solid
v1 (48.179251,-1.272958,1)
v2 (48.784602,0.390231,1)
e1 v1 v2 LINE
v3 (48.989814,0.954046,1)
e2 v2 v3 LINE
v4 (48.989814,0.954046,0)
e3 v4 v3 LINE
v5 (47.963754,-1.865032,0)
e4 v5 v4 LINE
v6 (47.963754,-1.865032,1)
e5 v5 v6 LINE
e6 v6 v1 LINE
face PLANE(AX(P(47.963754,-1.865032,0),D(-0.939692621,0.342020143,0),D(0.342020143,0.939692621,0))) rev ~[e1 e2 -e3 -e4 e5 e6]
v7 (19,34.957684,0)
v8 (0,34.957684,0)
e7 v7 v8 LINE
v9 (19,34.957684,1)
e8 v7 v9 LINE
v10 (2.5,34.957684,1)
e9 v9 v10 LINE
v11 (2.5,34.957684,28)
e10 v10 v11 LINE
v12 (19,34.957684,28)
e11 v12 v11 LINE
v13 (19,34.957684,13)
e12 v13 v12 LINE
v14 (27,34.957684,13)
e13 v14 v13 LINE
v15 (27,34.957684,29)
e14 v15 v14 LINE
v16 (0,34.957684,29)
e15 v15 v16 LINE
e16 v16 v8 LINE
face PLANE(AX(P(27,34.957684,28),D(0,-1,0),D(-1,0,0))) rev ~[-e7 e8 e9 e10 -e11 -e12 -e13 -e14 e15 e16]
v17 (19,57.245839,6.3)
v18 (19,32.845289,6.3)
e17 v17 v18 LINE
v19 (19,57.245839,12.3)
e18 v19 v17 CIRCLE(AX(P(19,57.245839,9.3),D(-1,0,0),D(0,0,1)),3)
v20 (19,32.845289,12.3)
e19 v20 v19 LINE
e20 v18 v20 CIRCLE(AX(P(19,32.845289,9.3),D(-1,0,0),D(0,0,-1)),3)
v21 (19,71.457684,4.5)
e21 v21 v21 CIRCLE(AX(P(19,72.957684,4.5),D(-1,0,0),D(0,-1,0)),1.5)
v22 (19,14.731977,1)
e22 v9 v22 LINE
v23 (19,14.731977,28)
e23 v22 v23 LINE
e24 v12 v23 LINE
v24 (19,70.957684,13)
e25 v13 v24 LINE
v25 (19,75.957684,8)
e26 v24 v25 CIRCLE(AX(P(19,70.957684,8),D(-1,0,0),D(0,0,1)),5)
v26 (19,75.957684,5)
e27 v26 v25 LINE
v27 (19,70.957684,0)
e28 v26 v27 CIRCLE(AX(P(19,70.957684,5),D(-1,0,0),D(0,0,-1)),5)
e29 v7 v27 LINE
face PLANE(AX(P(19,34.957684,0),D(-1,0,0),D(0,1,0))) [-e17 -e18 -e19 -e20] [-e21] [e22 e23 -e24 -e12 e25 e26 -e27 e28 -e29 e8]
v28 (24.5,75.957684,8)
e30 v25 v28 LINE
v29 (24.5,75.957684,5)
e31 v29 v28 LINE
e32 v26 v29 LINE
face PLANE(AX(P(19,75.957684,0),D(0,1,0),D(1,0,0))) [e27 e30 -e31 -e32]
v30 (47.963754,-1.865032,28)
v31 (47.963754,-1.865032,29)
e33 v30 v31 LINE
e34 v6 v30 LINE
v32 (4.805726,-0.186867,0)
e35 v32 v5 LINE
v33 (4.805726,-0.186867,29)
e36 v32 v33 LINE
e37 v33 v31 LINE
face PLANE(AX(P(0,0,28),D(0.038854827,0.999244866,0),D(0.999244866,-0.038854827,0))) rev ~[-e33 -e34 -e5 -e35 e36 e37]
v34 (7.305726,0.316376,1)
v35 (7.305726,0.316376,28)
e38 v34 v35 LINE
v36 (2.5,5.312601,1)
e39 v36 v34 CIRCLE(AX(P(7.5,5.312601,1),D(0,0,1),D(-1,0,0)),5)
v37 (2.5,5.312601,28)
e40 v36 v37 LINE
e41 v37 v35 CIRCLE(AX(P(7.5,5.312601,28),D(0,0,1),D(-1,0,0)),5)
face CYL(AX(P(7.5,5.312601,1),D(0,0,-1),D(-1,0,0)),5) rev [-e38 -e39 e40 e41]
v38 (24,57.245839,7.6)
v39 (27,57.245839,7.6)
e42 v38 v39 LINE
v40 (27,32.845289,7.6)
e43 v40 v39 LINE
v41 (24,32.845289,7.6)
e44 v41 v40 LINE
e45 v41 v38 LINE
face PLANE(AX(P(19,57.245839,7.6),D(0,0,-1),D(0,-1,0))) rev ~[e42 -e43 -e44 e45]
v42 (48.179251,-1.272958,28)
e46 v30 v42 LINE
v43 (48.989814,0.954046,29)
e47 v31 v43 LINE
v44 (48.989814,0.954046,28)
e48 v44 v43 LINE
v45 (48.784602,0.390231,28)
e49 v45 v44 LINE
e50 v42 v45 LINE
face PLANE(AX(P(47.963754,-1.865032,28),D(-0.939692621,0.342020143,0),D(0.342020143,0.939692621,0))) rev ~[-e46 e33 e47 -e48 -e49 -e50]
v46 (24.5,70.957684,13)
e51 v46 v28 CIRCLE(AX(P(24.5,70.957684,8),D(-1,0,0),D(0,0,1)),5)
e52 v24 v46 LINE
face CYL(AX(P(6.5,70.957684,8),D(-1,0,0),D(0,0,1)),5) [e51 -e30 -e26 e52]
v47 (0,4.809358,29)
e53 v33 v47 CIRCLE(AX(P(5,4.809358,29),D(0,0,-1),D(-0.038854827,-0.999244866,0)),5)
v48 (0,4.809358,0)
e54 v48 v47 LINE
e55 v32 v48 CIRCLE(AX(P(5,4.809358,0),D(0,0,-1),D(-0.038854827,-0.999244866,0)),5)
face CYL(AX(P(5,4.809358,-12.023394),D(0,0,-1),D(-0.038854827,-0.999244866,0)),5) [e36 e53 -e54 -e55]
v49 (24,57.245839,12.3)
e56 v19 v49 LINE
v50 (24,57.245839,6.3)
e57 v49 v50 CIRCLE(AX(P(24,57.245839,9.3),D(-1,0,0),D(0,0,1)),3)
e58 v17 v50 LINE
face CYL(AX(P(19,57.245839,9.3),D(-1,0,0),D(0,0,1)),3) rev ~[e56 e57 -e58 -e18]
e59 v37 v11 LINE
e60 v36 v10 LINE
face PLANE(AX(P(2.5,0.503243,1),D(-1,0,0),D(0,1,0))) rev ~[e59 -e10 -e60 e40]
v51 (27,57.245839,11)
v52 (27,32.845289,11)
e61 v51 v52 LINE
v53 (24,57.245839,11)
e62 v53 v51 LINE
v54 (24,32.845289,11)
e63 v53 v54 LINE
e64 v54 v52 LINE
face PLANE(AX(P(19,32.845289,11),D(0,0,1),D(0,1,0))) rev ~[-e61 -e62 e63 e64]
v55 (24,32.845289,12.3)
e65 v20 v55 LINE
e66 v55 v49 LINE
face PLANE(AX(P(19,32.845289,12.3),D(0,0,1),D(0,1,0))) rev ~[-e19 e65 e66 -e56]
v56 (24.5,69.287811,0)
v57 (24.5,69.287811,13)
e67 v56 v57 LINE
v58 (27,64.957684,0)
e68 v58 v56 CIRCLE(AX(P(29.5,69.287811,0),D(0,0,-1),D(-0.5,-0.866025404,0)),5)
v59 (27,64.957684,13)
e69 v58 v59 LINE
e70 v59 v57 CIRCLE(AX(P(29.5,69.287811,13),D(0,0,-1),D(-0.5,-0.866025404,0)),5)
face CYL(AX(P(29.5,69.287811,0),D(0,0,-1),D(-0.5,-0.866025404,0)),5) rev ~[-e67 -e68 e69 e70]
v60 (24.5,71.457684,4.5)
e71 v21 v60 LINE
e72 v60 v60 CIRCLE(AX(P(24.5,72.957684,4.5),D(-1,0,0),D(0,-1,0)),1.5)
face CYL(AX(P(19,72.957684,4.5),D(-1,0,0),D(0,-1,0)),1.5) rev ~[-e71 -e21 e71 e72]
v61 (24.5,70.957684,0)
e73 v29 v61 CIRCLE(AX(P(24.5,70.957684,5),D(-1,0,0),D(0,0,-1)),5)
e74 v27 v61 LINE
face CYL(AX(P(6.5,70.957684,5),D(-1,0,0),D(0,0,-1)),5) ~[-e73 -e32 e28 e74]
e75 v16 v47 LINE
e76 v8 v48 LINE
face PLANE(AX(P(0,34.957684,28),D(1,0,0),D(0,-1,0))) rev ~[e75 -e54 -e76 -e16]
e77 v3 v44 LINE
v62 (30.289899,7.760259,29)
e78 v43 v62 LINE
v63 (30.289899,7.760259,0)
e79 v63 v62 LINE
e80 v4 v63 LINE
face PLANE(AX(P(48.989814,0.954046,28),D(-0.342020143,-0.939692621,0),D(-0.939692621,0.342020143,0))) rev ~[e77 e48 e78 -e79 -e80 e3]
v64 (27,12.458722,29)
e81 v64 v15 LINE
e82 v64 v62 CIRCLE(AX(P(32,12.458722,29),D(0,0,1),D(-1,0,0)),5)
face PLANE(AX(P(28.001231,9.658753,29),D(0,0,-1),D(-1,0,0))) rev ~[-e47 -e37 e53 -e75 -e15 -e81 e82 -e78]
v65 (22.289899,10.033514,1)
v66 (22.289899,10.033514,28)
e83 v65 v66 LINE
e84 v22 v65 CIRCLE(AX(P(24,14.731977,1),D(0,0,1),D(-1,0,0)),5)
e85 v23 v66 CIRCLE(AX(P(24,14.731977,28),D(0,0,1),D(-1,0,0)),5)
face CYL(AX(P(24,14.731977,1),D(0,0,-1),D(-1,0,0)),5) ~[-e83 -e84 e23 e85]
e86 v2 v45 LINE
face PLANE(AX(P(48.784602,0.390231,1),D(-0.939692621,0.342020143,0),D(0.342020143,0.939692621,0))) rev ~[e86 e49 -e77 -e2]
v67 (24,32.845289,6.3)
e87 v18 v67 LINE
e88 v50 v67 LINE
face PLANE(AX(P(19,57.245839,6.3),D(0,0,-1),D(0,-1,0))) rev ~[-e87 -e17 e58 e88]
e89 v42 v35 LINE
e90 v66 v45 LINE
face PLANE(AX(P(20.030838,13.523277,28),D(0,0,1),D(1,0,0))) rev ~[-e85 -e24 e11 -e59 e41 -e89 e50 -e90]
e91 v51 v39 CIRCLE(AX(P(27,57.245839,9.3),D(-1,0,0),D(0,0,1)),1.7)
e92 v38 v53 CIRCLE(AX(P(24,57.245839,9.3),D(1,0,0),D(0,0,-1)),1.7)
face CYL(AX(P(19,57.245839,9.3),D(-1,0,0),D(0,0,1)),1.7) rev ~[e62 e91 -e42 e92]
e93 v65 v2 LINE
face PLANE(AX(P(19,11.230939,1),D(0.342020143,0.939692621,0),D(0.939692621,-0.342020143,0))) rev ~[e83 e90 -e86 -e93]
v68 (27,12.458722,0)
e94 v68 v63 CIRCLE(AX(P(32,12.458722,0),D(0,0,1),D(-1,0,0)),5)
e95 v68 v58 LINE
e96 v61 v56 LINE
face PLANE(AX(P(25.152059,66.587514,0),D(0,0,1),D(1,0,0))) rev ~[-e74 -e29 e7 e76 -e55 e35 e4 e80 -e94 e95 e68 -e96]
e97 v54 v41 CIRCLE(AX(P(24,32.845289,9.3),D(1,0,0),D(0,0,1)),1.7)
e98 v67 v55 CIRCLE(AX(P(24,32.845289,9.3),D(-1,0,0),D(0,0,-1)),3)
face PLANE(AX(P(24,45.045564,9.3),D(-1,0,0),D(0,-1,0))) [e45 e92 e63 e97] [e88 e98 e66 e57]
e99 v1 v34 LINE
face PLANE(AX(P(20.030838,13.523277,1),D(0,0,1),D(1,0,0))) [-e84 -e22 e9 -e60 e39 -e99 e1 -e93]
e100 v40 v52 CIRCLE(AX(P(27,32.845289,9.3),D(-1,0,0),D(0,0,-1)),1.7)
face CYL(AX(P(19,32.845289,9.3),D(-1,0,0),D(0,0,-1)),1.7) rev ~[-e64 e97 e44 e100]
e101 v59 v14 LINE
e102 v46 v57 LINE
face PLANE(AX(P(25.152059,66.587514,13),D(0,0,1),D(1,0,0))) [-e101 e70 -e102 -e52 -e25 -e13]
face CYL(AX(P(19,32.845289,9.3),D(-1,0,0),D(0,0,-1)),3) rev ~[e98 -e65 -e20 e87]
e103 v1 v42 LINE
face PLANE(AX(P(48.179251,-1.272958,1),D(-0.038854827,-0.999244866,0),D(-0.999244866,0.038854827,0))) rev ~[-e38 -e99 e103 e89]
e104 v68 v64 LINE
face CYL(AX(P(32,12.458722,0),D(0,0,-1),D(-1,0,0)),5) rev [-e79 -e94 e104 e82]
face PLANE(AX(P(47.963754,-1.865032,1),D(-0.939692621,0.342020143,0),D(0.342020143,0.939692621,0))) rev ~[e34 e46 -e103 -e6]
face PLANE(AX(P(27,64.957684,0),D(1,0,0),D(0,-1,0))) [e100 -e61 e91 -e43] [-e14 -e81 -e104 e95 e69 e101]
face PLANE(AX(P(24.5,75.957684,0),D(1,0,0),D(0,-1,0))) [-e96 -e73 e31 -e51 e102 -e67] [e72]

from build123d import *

# Parameters (mm, degrees)
F1_DEPTH      = 1
F3_DEPTH      = 27
F5_DEPTH      = 1
F7_DEPTH      = 13
F8_R          = 1.5
F9_DEPTH      = 25
F10_DEPTH     = 5
F11_T1_DEPTH  = 29
F11_T3_DEPTH  = 13
F11_T5_DEPTH  = 27
F11_T7_DEPTH  = 30.5
F11_T9_DEPTH  = 30.5
F11_T11_DEPTH = 53.0467878714
F11_T13_DEPTH = 27


# Not quite as in the source:
# - a fillet or chamfer that OpenCascade refuses, or shapes differently, is made with other operations: its cross-section is extruded or revolved along the edge and cut away or added


with BuildPart() as f1:
    # F0 (on Top) → F1 (new body)
    with BuildSketch(Plane.XY):
        Polygon((0, 34.9576839236), (0, 0), (47.9637535727, -1.8650316928), (48.9898140027, 0.9540461696), (27, 8.9576839236), (27, 34.9576839236), align=None)
    extrude(amount=F1_DEPTH)

    # F2 (on face) → F3 (join)
    with BuildSketch(Plane.XY.offset(1)):
        Polygon((2.5, 34.9576839236), (0, 34.9576839236), (0, 0), (47.9637535727, -1.8650316928), (48.1792508796, -1.2729577082), (2.5, 0.5032429485), align=None)
        Polygon((27, 34.9576839236), (19, 34.9576839236), (19, 11.2309391343), (48.7846019167, 0.3902305971), (48.9898140027, 0.9540461696), (27, 8.9576839236), align=None)
    extrude(amount=F3_DEPTH)

    # F4 (on face) → F5 (join)
    with BuildSketch(Plane.XY.offset(28)):
        Polygon((0, 34.9576839236), (0, 0), (47.9637535727, -1.8650316928), (48.9898140027, 0.9540461696), (27, 8.9576839236), (27, 34.9576839236), align=None)
    extrude(amount=F5_DEPTH)

    # F6 (on face) → F7 (join)
    with BuildSketch(Plane(origin=(0, 0, 0), x_dir=(1, 0, 0), z_dir=(0, 0, -1))):
        Polygon((27, -64.9576839236), (27, -34.9576839236), (19, -34.9576839236), (19, -75.9576839236), (24.5, -75.9576839236), (24.5, -64.9576839236), align=None)
    extrude(amount=-F7_DEPTH)

    # F8 (on face) → F9 (cut)
    with BuildSketch(Plane(origin=(19, 0, 0), x_dir=(0, -1, 0), z_dir=(-1, 0, 0))):
        with Locations((-72.9576839236, 4.5)):
            Circle(F8_R)
        with BuildLine():
            Line((-32.8452885151, 11), (-57.2458393872, 11))
            ThreePointArc((-57.2458393872, 11), (-58.9458393872, 9.3), (-57.2458393872, 7.6))
            Line((-57.2458393872, 7.6), (-32.8452885151, 7.6))
            ThreePointArc((-32.8452885151, 7.6), (-31.1452885151, 9.3), (-32.8452885151, 11))
        make_face()
    extrude(amount=-F9_DEPTH, mode=Mode.SUBTRACT)

    # F8 (on face) → F10 (cut)
    with BuildSketch(Plane(origin=(19, 0, 0), x_dir=(0, -1, 0), z_dir=(-1, 0, 0))):
        with BuildLine():
            Line((-32.8452885151, 12.3), (-57.2458393872, 12.3))
            ThreePointArc((-57.2458393872, 12.3), (-60.2458393872, 9.3), (-57.2458393872, 6.3))
            Line((-57.2458393872, 6.3), (-32.8452885151, 6.3))
            ThreePointArc((-32.8452885151, 6.3), (-29.8452885151, 9.3), (-32.8452885151, 12.3))
        make_face()
        with BuildLine():
            ThreePointArc((-57.2458393872, 7.6), (-58.9458393872, 9.3), (-57.2458393872, 11))
            Line((-57.2458393872, 11), (-32.8452885151, 11))
            ThreePointArc((-32.8452885151, 11), (-31.1452885151, 9.3), (-32.8452885151, 7.6))
            Line((-32.8452885151, 7.6), (-57.2458393872, 7.6))
        make_face(mode=Mode.SUBTRACT)
    extrude(amount=-F10_DEPTH, mode=Mode.SUBTRACT)

    # F11: fillet of radius 5 on 7 edges, made by hand

    # F11_s2 → F11_t1 (join)
    with BuildSketch(Plane.XY):
        with BuildLine():
            ThreePointArc((27, 12.4587216147), (27.9042397786, 9.5908394329), (30.2898992834, 7.7602585108))
            Line((30.2898992834, 7.7602585108), (27, 8.9576839236))
            Line((27, 8.9576839236), (27, 12.4587216147))
        make_face()
    extrude(amount=F11_T1_DEPTH)

    # F11_s4 → F11_t3 (join)
    with BuildSketch(Plane.XY):
        with BuildLine():
            ThreePointArc((27, 64.9576839236), (25.1698729811, 66.7878109426), (24.5, 69.2878109426))
            Line((24.5, 69.2878109426), (24.5, 64.9576839236))
            Line((24.5, 64.9576839236), (27, 64.9576839236))
        make_face()
    extrude(amount=F11_T3_DEPTH)

    # F11_s6 → F11_t5 (join)
    with BuildSketch(Plane.XY.offset(1)):
        with BuildLine():
            ThreePointArc((2.5, 5.3126005228), (3.8964343579, 1.8464333797), (7.3057258653, 0.3163761923))
            Line((7.3057258653, 0.3163761923), (2.5, 0.5032429485))
            Line((2.5, 0.5032429485), (2.5, 5.3126005228))
        make_face()
    extrude(amount=F11_T5_DEPTH)

    # F11_s8 → F11_t7 (cut)
    with BuildSketch(Plane.YZ.offset(6.5)):
        with BuildLine():
            ThreePointArc((70.9576839236, 0), (74.4932178296, 1.4644660941), (75.9576839236, 5))
            Line((75.9576839236, 5), (75.9576839236, 0))
            Line((75.9576839236, 0), (70.9576839236, 0))
        make_face()
    extrude(amount=F11_T7_DEPTH, mode=Mode.SUBTRACT)

    # F11_s10 → F11_t9 (cut)
    with BuildSketch(Plane.YZ.offset(6.5)):
        with BuildLine():
            ThreePointArc((70.9576839236, 13), (74.4932178296, 11.5355339059), (75.9576839236, 8))
            Line((75.9576839236, 8), (75.9576839236, 13))
            Line((75.9576839236, 13), (70.9576839236, 13))
        make_face()
    extrude(amount=F11_T9_DEPTH, mode=Mode.SUBTRACT)

    # F11_s12 → F11_t11 (cut)
    with BuildSketch(Plane.XY.offset(-12.0233939357)):
        with BuildLine():
            ThreePointArc((4.8057258653, -0.1868667562), (1.3964343579, 1.3431904313), (0, 4.8093575743))
            Line((0, 4.8093575743), (0, 0))
            Line((0, 0), (4.8057258653, -0.1868667562))
        make_face()
    extrude(amount=F11_T11_DEPTH, mode=Mode.SUBTRACT)

    # F11_s14 → F11_t13 (cut)
    with BuildSketch(Plane.XY.offset(1)):
        with BuildLine():
            ThreePointArc((19, 14.7319768253), (19.9042397786, 11.8640946436), (22.2898992834, 10.0335137214))
            Line((22.2898992834, 10.0335137214), (19, 11.2309391343))
            Line((19, 11.2309391343), (19, 14.7319768253))
        make_face()
    extrude(amount=F11_T13_DEPTH, mode=Mode.SUBTRACT)


solid = f1.part
